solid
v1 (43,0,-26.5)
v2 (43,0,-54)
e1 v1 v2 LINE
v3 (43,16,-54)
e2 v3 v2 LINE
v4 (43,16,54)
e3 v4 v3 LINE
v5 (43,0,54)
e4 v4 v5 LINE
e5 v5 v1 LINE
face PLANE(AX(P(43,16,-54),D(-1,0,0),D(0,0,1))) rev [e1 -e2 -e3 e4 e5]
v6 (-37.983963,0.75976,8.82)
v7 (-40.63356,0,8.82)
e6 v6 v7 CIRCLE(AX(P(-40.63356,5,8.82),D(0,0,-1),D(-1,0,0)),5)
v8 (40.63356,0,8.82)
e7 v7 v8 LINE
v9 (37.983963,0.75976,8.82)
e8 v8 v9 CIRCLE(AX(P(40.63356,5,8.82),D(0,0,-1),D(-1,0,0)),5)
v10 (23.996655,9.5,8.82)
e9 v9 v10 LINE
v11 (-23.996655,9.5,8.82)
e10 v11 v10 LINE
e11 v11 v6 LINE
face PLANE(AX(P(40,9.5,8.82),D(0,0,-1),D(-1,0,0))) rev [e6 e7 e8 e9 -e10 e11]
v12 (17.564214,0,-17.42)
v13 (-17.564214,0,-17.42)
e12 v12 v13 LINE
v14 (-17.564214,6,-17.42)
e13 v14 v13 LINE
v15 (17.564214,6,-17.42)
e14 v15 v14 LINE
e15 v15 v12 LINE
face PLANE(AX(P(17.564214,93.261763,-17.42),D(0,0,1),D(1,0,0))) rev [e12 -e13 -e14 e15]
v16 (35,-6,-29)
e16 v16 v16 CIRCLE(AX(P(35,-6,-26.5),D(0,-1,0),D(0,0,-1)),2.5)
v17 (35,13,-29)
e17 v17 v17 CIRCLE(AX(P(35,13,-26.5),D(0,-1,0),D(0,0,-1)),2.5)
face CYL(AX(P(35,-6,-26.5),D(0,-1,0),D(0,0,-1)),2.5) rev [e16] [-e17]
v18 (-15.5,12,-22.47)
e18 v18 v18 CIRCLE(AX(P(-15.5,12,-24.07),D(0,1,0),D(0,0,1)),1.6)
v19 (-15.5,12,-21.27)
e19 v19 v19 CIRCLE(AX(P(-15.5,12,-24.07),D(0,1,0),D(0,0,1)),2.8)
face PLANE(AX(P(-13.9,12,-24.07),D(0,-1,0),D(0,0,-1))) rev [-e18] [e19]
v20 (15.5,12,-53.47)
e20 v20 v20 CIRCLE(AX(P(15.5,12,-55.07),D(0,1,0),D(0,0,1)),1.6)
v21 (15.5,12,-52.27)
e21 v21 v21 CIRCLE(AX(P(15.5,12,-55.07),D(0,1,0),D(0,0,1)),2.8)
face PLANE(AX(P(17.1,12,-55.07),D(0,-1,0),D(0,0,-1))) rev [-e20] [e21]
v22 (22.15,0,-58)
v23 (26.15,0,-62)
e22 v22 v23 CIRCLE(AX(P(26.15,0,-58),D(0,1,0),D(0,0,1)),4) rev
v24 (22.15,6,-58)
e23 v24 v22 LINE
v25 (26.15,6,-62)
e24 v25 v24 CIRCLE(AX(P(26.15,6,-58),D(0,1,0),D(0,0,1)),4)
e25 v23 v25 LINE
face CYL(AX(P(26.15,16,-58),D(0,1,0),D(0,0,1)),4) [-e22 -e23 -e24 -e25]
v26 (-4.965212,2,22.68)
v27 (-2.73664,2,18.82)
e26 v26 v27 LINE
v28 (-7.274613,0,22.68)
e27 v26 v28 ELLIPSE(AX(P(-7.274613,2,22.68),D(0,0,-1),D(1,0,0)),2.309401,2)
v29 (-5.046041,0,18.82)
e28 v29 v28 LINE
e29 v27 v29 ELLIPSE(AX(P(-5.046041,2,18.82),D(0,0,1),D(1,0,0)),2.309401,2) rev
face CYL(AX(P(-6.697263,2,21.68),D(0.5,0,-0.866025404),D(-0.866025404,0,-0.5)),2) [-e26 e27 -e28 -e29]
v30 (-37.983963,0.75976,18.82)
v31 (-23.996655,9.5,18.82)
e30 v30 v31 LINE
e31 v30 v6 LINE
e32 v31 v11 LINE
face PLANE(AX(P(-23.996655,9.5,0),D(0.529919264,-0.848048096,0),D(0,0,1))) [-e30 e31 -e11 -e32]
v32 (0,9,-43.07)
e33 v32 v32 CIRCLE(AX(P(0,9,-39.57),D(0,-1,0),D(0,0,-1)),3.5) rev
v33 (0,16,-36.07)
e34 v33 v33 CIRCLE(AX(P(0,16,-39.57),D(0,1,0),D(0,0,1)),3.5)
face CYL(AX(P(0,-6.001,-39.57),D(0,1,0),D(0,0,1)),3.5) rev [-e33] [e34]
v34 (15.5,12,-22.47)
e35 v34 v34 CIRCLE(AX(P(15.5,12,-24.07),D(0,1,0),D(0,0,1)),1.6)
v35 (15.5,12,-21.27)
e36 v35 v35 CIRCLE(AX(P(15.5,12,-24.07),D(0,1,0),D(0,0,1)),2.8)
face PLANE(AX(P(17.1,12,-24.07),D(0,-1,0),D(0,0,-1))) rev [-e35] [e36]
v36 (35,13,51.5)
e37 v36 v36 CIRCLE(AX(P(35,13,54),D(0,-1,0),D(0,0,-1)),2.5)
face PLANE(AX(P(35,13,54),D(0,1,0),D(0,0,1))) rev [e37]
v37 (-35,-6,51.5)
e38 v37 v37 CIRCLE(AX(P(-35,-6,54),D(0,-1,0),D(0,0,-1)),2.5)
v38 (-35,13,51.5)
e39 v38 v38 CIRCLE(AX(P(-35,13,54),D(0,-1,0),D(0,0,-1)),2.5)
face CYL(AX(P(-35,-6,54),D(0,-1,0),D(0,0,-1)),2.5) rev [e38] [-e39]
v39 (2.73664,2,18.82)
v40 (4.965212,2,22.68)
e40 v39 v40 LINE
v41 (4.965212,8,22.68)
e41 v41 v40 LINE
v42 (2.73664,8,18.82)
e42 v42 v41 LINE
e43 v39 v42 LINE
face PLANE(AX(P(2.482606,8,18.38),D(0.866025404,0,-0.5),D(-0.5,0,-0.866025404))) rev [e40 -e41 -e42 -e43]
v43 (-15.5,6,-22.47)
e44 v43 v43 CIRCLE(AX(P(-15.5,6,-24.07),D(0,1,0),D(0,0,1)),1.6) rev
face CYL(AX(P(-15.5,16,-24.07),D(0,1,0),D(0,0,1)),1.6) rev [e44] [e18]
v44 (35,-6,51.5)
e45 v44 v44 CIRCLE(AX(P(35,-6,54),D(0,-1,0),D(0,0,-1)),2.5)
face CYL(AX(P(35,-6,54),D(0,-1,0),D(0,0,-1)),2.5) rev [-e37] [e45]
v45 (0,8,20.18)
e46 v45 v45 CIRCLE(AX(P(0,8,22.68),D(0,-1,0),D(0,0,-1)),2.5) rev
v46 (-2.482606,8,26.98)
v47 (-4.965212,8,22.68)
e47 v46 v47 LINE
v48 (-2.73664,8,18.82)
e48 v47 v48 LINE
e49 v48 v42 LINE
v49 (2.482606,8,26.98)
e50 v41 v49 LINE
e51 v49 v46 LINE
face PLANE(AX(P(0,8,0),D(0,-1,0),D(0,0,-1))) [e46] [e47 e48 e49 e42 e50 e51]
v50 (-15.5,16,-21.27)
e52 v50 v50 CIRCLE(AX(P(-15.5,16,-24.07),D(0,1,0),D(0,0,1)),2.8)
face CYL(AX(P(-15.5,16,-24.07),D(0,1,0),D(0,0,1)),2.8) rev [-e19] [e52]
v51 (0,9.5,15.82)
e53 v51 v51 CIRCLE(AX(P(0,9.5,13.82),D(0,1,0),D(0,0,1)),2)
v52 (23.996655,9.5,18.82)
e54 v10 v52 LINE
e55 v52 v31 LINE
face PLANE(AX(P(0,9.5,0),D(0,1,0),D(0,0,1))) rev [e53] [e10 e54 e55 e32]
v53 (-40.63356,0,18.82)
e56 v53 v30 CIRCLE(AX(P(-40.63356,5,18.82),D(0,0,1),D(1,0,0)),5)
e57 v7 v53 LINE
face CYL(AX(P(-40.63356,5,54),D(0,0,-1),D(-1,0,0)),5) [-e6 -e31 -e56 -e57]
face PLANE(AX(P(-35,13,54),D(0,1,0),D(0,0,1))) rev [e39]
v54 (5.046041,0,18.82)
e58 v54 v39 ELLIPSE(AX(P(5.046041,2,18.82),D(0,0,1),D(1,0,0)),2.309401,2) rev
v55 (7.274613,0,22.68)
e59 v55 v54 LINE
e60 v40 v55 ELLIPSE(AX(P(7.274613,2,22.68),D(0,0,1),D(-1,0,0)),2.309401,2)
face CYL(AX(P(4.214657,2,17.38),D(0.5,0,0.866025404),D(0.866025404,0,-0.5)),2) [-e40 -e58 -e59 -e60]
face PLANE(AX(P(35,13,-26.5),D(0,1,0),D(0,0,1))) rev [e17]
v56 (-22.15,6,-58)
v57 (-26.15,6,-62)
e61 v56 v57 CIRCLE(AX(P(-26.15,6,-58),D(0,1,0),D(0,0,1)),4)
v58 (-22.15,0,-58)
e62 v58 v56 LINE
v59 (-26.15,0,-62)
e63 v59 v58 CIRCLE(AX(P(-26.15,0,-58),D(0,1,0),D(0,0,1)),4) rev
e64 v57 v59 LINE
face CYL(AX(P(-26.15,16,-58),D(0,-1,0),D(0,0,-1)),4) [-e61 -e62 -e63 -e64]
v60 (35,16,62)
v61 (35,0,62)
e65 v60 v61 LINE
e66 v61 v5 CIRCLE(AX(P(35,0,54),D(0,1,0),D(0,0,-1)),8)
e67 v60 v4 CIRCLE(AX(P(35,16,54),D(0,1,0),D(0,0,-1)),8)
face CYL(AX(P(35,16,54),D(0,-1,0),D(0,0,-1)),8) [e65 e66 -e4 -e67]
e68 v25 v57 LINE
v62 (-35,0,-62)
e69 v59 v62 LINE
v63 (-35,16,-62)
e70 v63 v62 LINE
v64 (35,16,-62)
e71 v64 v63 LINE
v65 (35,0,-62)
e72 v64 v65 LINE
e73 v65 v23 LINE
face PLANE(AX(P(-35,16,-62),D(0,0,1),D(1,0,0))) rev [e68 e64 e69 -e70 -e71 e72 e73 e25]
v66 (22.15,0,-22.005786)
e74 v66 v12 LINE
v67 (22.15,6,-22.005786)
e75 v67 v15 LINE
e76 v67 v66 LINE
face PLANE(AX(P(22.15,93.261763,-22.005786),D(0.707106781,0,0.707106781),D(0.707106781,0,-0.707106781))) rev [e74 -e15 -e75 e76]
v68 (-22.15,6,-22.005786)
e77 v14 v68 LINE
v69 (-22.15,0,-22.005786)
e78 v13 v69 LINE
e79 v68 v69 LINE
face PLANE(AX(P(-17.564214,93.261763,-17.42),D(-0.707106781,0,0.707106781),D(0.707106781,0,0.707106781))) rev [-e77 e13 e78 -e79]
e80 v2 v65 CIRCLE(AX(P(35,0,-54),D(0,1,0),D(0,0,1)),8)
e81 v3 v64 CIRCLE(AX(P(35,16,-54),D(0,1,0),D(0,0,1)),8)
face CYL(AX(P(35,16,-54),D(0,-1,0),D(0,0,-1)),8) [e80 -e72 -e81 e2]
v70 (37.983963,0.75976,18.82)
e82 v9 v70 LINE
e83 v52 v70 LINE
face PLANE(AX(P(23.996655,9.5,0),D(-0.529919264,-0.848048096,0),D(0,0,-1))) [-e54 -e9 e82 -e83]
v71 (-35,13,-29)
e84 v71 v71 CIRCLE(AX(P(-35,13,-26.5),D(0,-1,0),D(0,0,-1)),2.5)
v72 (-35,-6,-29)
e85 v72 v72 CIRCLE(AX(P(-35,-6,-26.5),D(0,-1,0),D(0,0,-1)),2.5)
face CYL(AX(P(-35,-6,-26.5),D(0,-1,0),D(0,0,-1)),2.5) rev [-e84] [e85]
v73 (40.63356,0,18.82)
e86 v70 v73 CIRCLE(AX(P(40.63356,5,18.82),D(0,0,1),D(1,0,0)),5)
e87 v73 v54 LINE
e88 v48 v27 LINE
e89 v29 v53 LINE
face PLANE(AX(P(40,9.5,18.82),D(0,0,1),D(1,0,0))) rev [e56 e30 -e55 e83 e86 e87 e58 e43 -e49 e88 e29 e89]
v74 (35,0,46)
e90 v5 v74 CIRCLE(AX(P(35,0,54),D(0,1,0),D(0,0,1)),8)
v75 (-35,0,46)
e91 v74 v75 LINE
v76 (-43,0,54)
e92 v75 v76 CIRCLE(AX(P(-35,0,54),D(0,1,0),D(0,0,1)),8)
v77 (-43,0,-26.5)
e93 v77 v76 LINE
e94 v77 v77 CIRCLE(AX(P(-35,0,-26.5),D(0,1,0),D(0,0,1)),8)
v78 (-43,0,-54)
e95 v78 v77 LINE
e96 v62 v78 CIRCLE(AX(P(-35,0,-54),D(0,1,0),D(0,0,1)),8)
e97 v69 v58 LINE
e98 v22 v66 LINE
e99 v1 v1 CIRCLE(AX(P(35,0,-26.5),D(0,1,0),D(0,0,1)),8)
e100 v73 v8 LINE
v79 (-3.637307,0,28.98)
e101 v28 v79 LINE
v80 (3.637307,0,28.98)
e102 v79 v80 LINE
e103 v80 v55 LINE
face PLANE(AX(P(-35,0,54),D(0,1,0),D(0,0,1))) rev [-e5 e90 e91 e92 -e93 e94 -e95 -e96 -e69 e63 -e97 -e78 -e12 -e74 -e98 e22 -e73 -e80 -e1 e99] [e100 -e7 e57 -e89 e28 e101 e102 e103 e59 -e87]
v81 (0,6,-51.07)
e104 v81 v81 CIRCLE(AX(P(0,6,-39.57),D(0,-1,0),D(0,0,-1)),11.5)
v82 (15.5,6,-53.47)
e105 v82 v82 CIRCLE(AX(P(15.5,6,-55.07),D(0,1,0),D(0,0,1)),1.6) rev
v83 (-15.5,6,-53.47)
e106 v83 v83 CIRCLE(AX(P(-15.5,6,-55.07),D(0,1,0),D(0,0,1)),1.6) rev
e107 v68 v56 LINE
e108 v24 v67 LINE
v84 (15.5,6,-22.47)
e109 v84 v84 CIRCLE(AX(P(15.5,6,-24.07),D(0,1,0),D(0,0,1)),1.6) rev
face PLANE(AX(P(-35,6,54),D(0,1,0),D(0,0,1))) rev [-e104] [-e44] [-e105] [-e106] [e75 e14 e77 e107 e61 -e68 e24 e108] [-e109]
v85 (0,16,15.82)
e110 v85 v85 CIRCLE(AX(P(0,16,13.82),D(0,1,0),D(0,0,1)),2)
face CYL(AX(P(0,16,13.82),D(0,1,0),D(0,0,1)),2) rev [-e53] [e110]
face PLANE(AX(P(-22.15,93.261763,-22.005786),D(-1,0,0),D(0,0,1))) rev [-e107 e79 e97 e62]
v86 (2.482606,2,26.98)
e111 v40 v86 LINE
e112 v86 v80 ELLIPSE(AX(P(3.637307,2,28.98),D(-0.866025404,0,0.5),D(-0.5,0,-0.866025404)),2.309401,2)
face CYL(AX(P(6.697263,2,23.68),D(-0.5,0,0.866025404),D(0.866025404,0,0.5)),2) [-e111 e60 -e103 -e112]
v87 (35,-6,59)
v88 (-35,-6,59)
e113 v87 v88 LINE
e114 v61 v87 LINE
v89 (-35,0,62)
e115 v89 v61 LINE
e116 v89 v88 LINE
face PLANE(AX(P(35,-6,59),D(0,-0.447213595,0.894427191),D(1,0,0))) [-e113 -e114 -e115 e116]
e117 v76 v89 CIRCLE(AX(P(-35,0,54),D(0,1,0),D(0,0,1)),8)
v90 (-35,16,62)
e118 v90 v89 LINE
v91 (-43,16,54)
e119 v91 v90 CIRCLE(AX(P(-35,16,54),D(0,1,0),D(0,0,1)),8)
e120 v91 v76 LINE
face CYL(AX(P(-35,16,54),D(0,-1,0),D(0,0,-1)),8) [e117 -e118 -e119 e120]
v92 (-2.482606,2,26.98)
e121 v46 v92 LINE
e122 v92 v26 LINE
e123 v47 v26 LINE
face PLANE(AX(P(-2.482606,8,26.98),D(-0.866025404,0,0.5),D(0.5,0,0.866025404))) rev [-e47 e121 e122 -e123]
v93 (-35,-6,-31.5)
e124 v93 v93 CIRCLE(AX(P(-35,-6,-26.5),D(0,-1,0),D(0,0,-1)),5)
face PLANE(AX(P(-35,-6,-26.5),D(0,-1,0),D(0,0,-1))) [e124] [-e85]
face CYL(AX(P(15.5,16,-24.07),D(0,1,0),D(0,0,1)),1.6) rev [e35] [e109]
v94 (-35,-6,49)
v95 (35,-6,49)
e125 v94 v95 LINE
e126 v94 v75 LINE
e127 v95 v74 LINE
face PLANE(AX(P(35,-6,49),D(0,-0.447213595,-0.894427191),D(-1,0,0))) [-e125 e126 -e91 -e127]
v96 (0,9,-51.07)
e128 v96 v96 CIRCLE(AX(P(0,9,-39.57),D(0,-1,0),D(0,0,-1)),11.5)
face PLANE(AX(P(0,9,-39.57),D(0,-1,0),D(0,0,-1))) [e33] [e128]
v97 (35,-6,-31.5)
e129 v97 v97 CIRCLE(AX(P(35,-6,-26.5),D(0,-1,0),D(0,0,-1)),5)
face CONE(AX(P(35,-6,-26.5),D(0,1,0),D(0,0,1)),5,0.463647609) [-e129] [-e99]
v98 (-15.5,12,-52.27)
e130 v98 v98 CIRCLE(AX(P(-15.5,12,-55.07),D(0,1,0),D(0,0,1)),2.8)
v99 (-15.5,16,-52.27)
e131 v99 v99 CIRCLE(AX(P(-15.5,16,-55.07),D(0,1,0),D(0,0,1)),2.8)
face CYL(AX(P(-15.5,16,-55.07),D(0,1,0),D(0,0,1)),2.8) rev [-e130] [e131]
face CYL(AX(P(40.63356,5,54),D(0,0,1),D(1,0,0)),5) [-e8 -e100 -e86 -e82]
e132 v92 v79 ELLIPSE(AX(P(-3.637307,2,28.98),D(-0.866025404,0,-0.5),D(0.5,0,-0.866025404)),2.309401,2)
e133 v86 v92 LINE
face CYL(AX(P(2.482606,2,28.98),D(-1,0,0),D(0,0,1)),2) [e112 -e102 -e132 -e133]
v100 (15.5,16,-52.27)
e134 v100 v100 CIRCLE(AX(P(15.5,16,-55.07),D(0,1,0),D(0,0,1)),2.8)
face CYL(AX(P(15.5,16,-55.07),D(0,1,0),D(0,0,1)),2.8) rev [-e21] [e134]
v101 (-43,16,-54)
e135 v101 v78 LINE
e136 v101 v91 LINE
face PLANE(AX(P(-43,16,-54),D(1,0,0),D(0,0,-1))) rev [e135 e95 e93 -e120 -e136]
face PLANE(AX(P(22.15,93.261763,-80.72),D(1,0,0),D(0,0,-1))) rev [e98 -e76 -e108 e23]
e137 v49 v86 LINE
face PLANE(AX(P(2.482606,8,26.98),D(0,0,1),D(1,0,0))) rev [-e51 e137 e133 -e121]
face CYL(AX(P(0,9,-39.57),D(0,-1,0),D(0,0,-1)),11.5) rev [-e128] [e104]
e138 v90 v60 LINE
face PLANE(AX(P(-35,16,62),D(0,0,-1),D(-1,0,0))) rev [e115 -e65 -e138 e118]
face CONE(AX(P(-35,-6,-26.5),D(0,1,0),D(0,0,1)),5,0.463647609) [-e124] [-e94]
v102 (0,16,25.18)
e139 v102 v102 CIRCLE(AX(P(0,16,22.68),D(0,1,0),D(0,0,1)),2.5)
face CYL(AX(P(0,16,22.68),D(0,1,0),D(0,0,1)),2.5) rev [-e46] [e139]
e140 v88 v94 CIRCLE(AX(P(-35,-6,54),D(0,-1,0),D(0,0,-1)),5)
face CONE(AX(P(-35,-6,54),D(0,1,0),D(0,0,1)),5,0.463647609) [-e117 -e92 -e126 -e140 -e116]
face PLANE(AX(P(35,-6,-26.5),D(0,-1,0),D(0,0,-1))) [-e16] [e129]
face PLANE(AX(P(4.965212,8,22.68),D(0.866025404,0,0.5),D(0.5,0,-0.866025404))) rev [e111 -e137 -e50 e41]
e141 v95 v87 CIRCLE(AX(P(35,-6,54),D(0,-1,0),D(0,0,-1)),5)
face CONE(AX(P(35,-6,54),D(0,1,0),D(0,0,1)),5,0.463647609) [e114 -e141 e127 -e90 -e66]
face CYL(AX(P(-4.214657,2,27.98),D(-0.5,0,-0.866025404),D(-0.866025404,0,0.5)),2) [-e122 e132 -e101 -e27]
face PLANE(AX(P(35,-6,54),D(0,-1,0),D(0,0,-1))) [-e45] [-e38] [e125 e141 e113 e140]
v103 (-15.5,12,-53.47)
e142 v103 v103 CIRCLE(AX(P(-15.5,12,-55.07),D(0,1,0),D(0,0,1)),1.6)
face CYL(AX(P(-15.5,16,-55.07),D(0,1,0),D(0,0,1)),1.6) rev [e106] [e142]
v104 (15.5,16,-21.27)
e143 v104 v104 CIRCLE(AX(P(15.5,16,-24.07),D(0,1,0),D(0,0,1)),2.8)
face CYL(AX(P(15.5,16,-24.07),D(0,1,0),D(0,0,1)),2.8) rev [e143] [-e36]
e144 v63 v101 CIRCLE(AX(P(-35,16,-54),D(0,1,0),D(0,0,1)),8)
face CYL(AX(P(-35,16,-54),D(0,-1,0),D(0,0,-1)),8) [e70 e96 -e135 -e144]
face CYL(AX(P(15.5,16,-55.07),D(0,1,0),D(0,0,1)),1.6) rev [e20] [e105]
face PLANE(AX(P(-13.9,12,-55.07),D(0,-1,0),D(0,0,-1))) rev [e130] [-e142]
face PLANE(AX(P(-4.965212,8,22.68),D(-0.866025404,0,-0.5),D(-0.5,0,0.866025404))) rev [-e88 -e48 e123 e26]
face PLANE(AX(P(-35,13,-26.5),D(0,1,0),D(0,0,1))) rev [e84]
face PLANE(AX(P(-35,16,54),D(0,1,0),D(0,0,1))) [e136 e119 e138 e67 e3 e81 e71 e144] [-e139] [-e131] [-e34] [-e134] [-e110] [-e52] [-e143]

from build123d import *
from OCP.BRepFilletAPI import BRepFilletAPI_MakeChamfer

# Parameters (mm, degrees)
BOSS_EXTRUDE1_DEPTH            = 16
SKETCH17_R                     = 5
BOSS_EXTRUDE2_DEPTH            = 6
CUT_EXTRUDE7_REACH             = 80.594
SKETCH14_R                     = 3.5
SKETCH16_W                     = 80
SKETCH16_H                     = 10
CUT_EXTRUDE8_DEPTH             = 9.5
CHAMFER3_SIZE                  = 3
CHAMFER3_SIZE_2                = 6
CBORE_FOR_M3_SHCS1_D           = 3.2
CBORE_FOR_M3_SHCS1_CBORE_D     = 5.6
CBORE_FOR_M3_SHCS1_CBORE_DEPTH = 4
CHAMFER4_SIZE                  = 10
CHAMFER4_SIZE_2                = 16.00334529
F_5_0MM_DOWEL_HOLE1_D          = 5
F_5_0MM_DOWEL_HOLE1_DEPTH      = 19
F_4_0MM_DOWEL_HOLE1_D          = 4
F_5_0MM_DOWEL_HOLE2_D          = 5
FILLET2_R                      = 5
CUT_EXTRUDE9_DEPTH             = 6
FILLET3_R                      = 4
SKETCH13_R                     = 11.5
CUT_EXTRUDE6_DEPTH             = 3
CUT_EXTRUDE10_DEPTH            = 8
FILLET4_R                      = 2


# Some blends are built 0.0001 mm under size
with BuildPart() as part:
    # Sketch1 → Boss-Extrude1 (new body)
    with BuildSketch(Plane(origin=(0, 0, 0), x_dir=(1, 0, 0), z_dir=(0, 1, 0))):
        with BuildLine():
            Line((-35, 62), (35, 62))
            ThreePointArc((35, 62), (40.656854249, 59.656854249), (43, 54))
            Line((43, 54), (43, -54))
            ThreePointArc((43, -54), (40.656854249, -59.656854249), (35, -62))
            Line((35, -62), (-35, -62))
            ThreePointArc((-35, -62), (-40.656854249, -59.656854249), (-43, -54))
            Line((-43, -54), (-43, 54))
            ThreePointArc((-43, 54), (-40.656854249, 59.656854249), (-35, 62))
        make_face()
    extrude(amount=BOSS_EXTRUDE1_DEPTH)

    # Sketch17 → Boss-Extrude2 (add)
    with BuildSketch(Plane(origin=(0, 0, 0), x_dir=(-1, 0, 0), z_dir=(0, -1, 0))):
        with Locations(Location((35, 26.5, 0), (0, 0, 270))):
            Circle(SKETCH17_R)
        with Locations(Location((-35, 26.5, 0), (0, 0, 270))):
            Circle(SKETCH17_R)
        with BuildLine():
            Line((-35, -49), (35, -49))
            ThreePointArc((35, -49), (40, -54), (35, -59))
            Line((35, -59), (-35, -59))
            ThreePointArc((-35, -59), (-40, -54), (-35, -49))
        make_face()
    extrude(amount=BOSS_EXTRUDE2_DEPTH)

    # Sketch14 → Cut-Extrude7 (cut, up to next)
    with BuildSketch(Plane(origin=(0, 16, 0), x_dir=(1, 0, 0), z_dir=(0, 1, 0)), mode=Mode.PRIVATE) as cut_extrude7_sk1:
        with Locations(Location((0, 39.569999996, 0), (0, 0, 270))):
            Circle(SKETCH14_R)
    cut_extrude7_tool1 = extrude(cut_extrude7_sk1.sketch, amount=-CUT_EXTRUDE7_REACH, mode=Mode.PRIVATE) & part.part
    add(cut_extrude7_tool1.solids().sort_by_distance((0, 16, -39.57))[0], mode=Mode.SUBTRACT)

    # Sketch16 → Cut-Extrude8 (cut)
    with BuildSketch(Plane(origin=(0, 0, 0), x_dir=(-1, 0, 0), z_dir=(0, -1, 0))):
        with Locations((0, -13.82)):
            Rectangle(SKETCH16_W, SKETCH16_H)
    extrude(amount=-CUT_EXTRUDE8_DEPTH, mode=Mode.SUBTRACT)

    # Chamfer3
    chamfer3_edges_1 = [part.edges().sort_by_distance(p)[0] for p in [
        (40, 0, 54),
    ]]
    chamfer3_side_1 = [part.faces().sort_by_distance(p)[0] for p in [
        (40.06, 0, 54),
    ]]
    chamfer3_edges_2 = [part.edges().sort_by_distance(p)[0] for p in [
        (0, 0, 59),
    ]]
    chamfer3_side_2 = [part.faces().sort_by_distance(p)[0] for p in [
        (0, 0, 59.06),
    ]]
    chamfer3_edges_3 = [part.edges().sort_by_distance(p)[0] for p in [
        (0, 0, 49),
    ]]
    chamfer3_side_3 = [part.faces().sort_by_distance(p)[0] for p in [
        (0, 0, 48.94),
    ]]
    chamfer3_edges_4 = [part.edges().sort_by_distance(p)[0] for p in [
        (-40, 0, 54),
    ]]
    chamfer3_side_4 = [part.faces().sort_by_distance(p)[0] for p in [
        (-40.06, 0, 54),
    ]]
    chamfer3_edges_5 = [part.edges().sort_by_distance(p)[0] for p in [
        (-35, 0, -31.5),
    ]]
    chamfer3_side_5 = [part.faces().sort_by_distance(p)[0] for p in [
        (-35, 0, -31.56),
    ]]
    chamfer3_edges_6 = [part.edges().sort_by_distance(p)[0] for p in [
        (35, 0, -31.5),
    ]]
    chamfer3_side_6 = [part.faces().sort_by_distance(p)[0] for p in [
        (35, 0, -31.56),
    ]]
    chamfer3 = BRepFilletAPI_MakeChamfer(part.part.solid().wrapped)
    for e in chamfer3_edges_1:
        chamfer3.Add(CHAMFER3_SIZE - 0.0001, CHAMFER3_SIZE_2 - 0.0001, e.wrapped, chamfer3_side_1[0].wrapped)
    for e in chamfer3_edges_2:
        chamfer3.Add(CHAMFER3_SIZE - 0.0001, CHAMFER3_SIZE_2 - 0.0001, e.wrapped, chamfer3_side_2[0].wrapped)
    for e in chamfer3_edges_3:
        chamfer3.Add(CHAMFER3_SIZE - 0.0001, CHAMFER3_SIZE_2 - 0.0001, e.wrapped, chamfer3_side_3[0].wrapped)
    for e in chamfer3_edges_4:
        chamfer3.Add(CHAMFER3_SIZE - 0.0001, CHAMFER3_SIZE_2 - 0.0001, e.wrapped, chamfer3_side_4[0].wrapped)
    for e in chamfer3_edges_5:
        chamfer3.Add(CHAMFER3_SIZE - 0.0001, CHAMFER3_SIZE_2 - 0.0001, e.wrapped, chamfer3_side_5[0].wrapped)
    for e in chamfer3_edges_6:
        chamfer3.Add(CHAMFER3_SIZE - 0.0001, CHAMFER3_SIZE_2 - 0.0001, e.wrapped, chamfer3_side_6[0].wrapped)
    add(Compound.cast(chamfer3.Shape()), mode=Mode.REPLACE)  # a hair under: the kernel refuses the full size

    # CBORE for M3 SHCS1 (through all)
    with Locations(Plane(origin=(0, 16, 0), x_dir=(1, 0, 0), z_dir=(0, 1, 0))):
        with Locations((-15.5, 55.069999996), (-15.5, 24.069999996), (15.5, 24.069999996), (15.5, 55.069999996)):
            CounterBoreHole(CBORE_FOR_M3_SHCS1_D / 2, CBORE_FOR_M3_SHCS1_CBORE_D / 2, CBORE_FOR_M3_SHCS1_CBORE_DEPTH)

    # Chamfer4
    # the kernel refuses this chamfer: 16.00334529, 10 mm, written as the material it adds along each edge
    with BuildSketch(Plane(origin=(40, 9.5, -32.554216019), x_dir=(0.05243311939005598, -0.9986244379099823, 0), z_dir=(0, 0, 1))) as chamfer4_piece_1_section:
        Polygon((CHAMFER4_SIZE * 0.99862443791, -CHAMFER4_SIZE * 0.0524331193901), (-CHAMFER4_SIZE_2 * 0.0524331193914, -CHAMFER4_SIZE_2 * 0.998624437936), (0, 0), align=None)
    chamfer4_piece_1 = extrude(amount=92.748432037, mode=Mode.PRIVATE)
    chamfer4_piece_1 = split(chamfer4_piece_1, bisect_by=Plane(origin=(34.599202333, 0, -11.867108009), z_dir=(0, 1, 0)), keep=Keep.TOP, mode=Mode.PRIVATE)
    add(chamfer4_piece_1)
    with BuildSketch(Plane(origin=(-40, 9.5, 60.194216019), x_dir=(-0.05243311939005598, -0.9986244379099823, 0), z_dir=(0, 0, -1))) as chamfer4_piece_2_section:
        Polygon((CHAMFER4_SIZE * 0.99862443791, -CHAMFER4_SIZE * 0.0524331193901), (-CHAMFER4_SIZE_2 * 0.0524331193914, -CHAMFER4_SIZE_2 * 0.998624437936), (0, 0), align=None)
    chamfer4_piece_2 = extrude(amount=92.748432037, mode=Mode.PRIVATE)
    chamfer4_piece_2 = split(chamfer4_piece_2, bisect_by=Plane(origin=(-34.599202333, 0, 39.507108009), z_dir=(0, 1, 0)), keep=Keep.TOP, mode=Mode.PRIVATE)
    add(chamfer4_piece_2)

    # Ø5.0mm Dowel Hole1
    with Locations(Plane.XZ.offset(6)):
        with Locations((-35, 54), (35, 54), (-35, -26.5), (35, -26.5)):
            Hole(F_5_0MM_DOWEL_HOLE1_D / 2, depth=F_5_0MM_DOWEL_HOLE1_DEPTH)

    # Ø4.0mm Dowel Hole1 (through all)
    with Locations(Plane(origin=(0, 16, 0), x_dir=(1, 0, 0), z_dir=(0, 1, 0))):
        with Locations((0, -13.82)):
            Hole(F_4_0MM_DOWEL_HOLE1_D / 2)

    # Ø5.0mm Dowel Hole2 (through all)
    with Locations(Plane(origin=(0, 16, 0), x_dir=(1, 0, 0), z_dir=(0, 1, 0))):
        with Locations((0, -22.680000004)):
            Hole(F_5_0MM_DOWEL_HOLE2_D / 2)

    # Fillet2
    fillet2_edges = [part.edges().sort_by_distance(p)[0] for p in [
        (39.199832735, 0, 13.82),
        (-39.199832735, 0, 13.82),
    ]]
    fillet(fillet2_edges, radius=FILLET2_R)

    # Sketch26 → Cut-Extrude9 (cut)
    with BuildSketch(Plane.XZ):
        Polygon((22.15, -80.719999996), (-22.15, -80.719999996), (-22.15, -22.005786434), (-17.564213562, -17.419999996), (17.564213562, -17.419999996), (22.15, -22.005786434), align=None)
    extrude(amount=-CUT_EXTRUDE9_DEPTH, mode=Mode.SUBTRACT)

    # Fillet3
    fillet3_edges = [part.edges().sort_by_distance(p)[0] for p in [
        (-22.15, 3, -62),
        (22.15, 3, -62),
    ]]
    fillet(fillet3_edges, radius=FILLET3_R)

    # Sketch13 → Cut-Extrude6 (cut)
    with BuildSketch(Plane.XZ.offset(-6)):
        with Locations(Location((0, -39.569999996, 0), (0, 0, 270))):
            Circle(SKETCH13_R)
    extrude(amount=-CUT_EXTRUDE6_DEPTH, mode=Mode.SUBTRACT)

    # Sketch28 → Cut-Extrude10 (cut)
    with BuildSketch(Plane(origin=(0, 0, 0), x_dir=(-1, 0, 0), z_dir=(0, -1, 0))):
        Polygon((4.965212315, -22.680000004), (2.482606157, -18.380000004), (-2.482606158, -18.380000004), (-4.965212315, -22.680000004), (-2.482606158, -26.980000004), (2.482606157, -26.980000004), align=None)
    extrude(amount=-CUT_EXTRUDE10_DEPTH, mode=Mode.SUBTRACT)

    # Fillet4
    fillet4_edges = [part.edges().sort_by_distance(p)[0] for p in [
        (-3.850926294, 0, 20.750000002),
        (3.850926295, 0, 20.750000002),
        (3.723909237, 0, 24.830000004),
        (0, 0, 26.980000004),
        (-3.723909236, 0, 24.830000004),
    ]]
    fillet(fillet4_edges, radius=FILLET4_R)


solid = part.part
